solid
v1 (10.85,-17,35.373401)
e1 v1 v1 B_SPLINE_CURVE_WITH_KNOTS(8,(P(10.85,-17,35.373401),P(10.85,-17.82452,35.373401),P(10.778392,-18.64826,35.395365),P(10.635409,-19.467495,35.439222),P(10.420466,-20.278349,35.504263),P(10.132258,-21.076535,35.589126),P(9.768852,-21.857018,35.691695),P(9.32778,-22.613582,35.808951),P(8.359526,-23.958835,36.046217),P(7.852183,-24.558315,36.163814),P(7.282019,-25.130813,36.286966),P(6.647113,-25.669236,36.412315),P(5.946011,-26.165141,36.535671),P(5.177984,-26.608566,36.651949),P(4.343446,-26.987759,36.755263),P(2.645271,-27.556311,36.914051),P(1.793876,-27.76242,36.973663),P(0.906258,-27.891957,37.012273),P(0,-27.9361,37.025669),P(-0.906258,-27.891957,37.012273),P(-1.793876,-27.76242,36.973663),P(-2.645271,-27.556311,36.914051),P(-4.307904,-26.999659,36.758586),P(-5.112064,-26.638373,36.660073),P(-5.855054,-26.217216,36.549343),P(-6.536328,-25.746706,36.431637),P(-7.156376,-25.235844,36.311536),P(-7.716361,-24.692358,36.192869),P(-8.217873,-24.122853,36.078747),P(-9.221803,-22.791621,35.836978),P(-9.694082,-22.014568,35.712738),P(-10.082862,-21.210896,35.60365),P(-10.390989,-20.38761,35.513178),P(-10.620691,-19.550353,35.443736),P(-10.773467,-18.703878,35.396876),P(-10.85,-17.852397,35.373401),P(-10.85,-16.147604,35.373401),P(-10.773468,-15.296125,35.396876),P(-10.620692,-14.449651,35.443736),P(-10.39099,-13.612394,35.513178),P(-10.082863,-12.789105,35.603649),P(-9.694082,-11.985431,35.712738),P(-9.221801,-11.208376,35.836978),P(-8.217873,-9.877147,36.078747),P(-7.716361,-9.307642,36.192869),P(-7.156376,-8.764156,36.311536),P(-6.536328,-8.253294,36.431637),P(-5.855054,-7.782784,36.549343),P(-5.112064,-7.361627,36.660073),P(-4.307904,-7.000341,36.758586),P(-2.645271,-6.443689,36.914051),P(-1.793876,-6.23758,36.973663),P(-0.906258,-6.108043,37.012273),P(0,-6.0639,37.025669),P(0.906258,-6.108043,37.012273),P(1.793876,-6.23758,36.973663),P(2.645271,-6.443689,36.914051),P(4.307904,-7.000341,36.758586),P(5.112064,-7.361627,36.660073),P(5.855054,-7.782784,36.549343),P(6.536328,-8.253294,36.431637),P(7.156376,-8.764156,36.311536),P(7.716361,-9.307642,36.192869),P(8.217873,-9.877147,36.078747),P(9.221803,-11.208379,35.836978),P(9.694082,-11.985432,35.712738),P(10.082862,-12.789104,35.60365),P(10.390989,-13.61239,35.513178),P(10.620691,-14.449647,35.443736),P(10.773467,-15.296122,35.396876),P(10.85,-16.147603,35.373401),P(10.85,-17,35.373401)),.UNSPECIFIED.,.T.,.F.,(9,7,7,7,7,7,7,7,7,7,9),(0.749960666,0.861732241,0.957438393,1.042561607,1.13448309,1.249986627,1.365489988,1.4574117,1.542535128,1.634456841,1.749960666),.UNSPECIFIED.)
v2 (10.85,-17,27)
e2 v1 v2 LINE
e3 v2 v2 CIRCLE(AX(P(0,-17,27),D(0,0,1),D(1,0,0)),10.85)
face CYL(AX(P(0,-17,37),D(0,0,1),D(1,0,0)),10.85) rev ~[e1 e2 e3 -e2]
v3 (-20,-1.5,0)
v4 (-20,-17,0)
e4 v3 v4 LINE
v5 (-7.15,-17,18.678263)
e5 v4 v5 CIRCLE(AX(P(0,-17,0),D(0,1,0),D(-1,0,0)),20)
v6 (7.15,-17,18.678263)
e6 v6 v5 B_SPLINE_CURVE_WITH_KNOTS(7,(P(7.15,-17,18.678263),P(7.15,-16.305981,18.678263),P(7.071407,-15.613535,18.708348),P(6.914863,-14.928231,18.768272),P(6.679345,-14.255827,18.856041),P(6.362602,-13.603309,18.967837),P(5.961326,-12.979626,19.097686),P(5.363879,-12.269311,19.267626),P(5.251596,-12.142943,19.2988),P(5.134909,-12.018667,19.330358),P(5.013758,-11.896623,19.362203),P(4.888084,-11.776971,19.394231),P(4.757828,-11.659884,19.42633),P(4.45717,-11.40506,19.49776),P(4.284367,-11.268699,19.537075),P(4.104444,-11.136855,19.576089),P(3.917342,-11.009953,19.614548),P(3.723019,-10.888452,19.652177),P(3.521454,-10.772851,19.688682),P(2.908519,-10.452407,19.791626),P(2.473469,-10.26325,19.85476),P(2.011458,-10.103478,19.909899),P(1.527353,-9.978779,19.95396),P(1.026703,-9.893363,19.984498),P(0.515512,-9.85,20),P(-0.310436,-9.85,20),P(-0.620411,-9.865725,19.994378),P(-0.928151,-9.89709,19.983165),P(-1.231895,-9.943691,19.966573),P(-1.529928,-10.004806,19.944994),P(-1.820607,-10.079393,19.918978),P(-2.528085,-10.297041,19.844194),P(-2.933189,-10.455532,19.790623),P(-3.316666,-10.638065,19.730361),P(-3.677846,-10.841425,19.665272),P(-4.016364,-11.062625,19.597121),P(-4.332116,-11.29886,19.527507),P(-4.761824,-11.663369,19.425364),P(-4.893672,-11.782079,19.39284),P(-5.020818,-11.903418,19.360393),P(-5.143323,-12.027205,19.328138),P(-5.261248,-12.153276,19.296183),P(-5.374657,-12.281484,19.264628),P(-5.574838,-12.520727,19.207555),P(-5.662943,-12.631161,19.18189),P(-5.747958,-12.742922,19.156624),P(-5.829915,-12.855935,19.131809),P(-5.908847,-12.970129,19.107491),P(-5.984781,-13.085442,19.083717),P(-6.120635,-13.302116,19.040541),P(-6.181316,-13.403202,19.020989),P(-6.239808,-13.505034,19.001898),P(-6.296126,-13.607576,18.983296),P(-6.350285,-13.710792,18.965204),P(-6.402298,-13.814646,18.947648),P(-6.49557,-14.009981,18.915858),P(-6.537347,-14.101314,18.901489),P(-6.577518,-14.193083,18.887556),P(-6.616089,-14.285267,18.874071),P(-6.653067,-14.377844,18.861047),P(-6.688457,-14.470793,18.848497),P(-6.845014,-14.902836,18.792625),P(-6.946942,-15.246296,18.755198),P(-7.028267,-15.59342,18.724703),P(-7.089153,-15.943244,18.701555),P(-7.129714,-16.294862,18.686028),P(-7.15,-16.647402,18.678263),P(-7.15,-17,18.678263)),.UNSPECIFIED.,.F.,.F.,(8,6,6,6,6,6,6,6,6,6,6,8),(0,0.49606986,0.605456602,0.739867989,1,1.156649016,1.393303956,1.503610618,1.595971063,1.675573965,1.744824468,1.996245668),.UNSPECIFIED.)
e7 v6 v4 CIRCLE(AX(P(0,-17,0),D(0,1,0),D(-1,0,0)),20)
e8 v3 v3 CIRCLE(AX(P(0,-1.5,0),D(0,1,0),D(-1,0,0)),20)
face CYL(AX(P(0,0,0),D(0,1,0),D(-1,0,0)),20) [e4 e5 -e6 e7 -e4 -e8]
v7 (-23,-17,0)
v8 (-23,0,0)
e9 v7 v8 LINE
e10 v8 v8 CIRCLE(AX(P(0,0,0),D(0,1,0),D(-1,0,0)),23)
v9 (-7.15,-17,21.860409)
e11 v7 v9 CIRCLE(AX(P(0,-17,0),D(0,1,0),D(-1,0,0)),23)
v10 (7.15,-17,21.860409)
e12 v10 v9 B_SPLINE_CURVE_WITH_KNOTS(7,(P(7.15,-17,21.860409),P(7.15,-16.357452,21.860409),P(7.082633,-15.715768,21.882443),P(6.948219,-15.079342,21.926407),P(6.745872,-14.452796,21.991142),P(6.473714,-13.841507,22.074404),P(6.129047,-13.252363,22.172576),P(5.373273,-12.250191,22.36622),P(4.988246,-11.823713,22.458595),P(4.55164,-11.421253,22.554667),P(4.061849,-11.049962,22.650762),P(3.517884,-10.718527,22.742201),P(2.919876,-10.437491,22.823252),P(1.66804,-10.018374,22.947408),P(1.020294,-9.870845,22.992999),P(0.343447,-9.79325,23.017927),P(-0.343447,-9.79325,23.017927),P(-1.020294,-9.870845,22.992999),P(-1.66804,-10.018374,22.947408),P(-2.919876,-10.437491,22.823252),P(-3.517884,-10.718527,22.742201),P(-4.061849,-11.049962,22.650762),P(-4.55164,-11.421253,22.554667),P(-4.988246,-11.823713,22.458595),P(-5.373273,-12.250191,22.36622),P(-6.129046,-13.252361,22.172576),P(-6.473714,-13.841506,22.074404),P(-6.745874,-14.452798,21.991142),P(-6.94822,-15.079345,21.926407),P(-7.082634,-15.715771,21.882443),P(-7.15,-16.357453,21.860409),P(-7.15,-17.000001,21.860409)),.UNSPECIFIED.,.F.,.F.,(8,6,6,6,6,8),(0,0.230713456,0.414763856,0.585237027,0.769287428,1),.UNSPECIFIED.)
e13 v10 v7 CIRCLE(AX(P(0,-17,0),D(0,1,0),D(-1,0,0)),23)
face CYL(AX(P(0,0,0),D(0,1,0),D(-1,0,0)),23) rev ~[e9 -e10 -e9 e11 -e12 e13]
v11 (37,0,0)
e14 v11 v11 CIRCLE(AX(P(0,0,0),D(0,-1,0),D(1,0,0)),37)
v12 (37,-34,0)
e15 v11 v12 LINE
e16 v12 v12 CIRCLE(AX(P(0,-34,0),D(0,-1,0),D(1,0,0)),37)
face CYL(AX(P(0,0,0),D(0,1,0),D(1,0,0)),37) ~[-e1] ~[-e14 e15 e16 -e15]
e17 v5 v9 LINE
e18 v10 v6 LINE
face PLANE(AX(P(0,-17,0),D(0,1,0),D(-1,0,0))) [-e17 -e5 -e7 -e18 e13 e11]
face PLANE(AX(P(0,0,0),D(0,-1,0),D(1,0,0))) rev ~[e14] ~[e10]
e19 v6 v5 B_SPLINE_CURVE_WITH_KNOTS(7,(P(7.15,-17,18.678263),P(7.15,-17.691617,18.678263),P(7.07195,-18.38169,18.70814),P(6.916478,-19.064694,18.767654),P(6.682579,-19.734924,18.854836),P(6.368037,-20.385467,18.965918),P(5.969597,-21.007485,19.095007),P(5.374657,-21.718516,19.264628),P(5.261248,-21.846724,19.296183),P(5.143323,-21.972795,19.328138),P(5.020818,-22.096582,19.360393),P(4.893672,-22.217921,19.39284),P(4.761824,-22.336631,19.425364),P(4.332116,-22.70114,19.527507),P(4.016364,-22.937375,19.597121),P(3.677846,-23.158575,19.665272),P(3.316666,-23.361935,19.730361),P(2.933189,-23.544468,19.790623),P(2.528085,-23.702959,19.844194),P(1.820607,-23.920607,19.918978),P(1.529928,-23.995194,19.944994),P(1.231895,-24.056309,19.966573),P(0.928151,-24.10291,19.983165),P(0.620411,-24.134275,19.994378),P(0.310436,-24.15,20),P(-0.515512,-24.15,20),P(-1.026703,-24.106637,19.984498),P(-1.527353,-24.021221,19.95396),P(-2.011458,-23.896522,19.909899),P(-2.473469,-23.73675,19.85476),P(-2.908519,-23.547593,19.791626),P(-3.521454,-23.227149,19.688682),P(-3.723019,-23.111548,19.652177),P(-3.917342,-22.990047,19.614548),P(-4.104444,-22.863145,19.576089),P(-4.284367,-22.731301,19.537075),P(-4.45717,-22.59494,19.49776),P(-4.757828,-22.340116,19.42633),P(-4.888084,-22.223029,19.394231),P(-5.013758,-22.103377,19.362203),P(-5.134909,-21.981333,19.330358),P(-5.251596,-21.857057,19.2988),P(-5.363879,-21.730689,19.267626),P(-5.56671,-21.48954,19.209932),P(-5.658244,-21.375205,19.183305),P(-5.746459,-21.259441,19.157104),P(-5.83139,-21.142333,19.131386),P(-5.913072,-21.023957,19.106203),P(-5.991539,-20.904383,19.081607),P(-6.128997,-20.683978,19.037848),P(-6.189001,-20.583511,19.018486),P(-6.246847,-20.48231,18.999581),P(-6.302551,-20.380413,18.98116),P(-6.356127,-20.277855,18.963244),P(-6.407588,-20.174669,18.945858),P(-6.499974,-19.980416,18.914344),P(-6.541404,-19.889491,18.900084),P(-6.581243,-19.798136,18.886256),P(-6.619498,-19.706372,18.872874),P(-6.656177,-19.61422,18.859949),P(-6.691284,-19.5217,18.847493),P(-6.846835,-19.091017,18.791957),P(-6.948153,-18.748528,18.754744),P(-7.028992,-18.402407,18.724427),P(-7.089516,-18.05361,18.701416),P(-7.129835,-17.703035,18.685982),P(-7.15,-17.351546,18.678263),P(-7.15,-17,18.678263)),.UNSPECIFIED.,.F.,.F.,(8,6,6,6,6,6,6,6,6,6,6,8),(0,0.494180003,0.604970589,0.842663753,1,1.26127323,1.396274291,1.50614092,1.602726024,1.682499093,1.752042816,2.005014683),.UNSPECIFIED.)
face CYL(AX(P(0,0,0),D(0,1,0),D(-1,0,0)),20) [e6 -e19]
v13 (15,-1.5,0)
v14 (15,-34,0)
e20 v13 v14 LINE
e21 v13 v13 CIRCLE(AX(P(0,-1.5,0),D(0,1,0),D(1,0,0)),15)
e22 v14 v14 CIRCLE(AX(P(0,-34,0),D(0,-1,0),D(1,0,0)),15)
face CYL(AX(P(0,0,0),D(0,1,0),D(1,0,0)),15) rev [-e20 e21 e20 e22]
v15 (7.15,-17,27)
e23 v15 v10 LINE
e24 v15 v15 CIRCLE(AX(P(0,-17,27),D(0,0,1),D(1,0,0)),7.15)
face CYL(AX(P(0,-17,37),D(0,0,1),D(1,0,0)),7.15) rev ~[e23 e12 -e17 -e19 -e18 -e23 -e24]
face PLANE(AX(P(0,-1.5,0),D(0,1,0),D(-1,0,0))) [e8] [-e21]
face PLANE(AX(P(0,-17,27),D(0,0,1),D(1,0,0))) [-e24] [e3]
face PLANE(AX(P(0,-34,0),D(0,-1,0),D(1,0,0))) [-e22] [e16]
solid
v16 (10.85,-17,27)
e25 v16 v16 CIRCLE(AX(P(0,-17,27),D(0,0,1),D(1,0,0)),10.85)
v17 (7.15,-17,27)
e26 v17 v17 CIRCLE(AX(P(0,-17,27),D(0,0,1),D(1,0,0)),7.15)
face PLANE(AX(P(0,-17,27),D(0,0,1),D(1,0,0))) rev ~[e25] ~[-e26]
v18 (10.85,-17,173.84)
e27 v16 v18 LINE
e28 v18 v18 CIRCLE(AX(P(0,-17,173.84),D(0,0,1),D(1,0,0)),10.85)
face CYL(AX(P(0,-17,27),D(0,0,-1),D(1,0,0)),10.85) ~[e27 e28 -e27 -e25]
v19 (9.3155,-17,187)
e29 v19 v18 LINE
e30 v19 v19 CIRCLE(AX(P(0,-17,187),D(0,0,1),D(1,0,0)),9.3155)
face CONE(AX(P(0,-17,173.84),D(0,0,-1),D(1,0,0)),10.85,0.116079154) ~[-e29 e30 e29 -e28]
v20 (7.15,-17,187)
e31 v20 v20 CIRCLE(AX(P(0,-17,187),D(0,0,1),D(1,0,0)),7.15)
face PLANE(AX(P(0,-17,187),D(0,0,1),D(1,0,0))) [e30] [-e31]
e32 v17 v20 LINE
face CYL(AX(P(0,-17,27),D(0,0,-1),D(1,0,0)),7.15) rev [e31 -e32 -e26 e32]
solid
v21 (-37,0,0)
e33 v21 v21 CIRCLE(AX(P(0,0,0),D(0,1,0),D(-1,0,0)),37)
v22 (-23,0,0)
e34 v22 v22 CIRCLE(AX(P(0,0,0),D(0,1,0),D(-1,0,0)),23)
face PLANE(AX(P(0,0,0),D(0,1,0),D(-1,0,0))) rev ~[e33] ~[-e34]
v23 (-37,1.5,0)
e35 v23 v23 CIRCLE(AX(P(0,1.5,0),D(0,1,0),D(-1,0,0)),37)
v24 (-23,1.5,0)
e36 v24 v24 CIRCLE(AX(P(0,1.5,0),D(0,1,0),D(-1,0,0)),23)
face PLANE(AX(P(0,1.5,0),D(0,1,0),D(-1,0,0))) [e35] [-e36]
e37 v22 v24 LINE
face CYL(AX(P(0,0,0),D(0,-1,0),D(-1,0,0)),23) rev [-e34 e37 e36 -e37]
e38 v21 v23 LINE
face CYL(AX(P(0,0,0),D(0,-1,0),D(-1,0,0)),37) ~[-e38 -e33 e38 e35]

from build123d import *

# Parameters (mm, degrees)
F0_R          = 37
F0_R_2        = 15
F1_DEPTH      = 34
F2_R          = 23
F2_R_2        = 15
F3_DEPTH      = 1.5
F4_R          = 23
F4_R_2        = 20
F5_DEPTH      = 17
F8_END_RADIUS = 20
F7_R          = 7.15
F8_REACH      = 94.2242539419
F9_R          = 10.85
F10_DEPTH     = 10
F11_R         = 10.85
F11_R_2       = 7.15
F12_DEPTH     = 160
F13_SIZE2     = 13.16
F13_SIZE      = 1.5345
F14_R         = 37
F14_R_2       = 23
F15_DEPTH     = 1.5


with BuildPart() as f1:
    # F0 (on Front) → F1 (new body)
    with BuildSketch(Plane.XZ):
        Circle(F0_R)
        Circle(F0_R_2, mode=Mode.SUBTRACT)
    extrude(amount=F1_DEPTH)

    # F2 (on face) → F3 (cut)
    with BuildSketch(Plane(origin=(0, 0, 0), x_dir=(-1, 0, 0), z_dir=(0, 1, 0))):
        Circle(F2_R)
        Circle(F2_R_2, mode=Mode.SUBTRACT)
    extrude(amount=-F3_DEPTH, mode=Mode.SUBTRACT)

    # F4 (on face) → F5 (cut)
    with BuildSketch(Plane(origin=(0, 0, 0), x_dir=(-1, 0, 0), z_dir=(0, 1, 0))):
        Circle(F4_R)
        Circle(F4_R_2, mode=Mode.SUBTRACT)
    extrude(amount=-F5_DEPTH, mode=Mode.SUBTRACT)

    f8_end = (Plane.ZX.offset(-9.25) * Cylinder(F8_END_RADIUS, 408.5212231395, mode=Mode.PRIVATE)).faces().sort_by_distance((20, -9.25, 0))[0]
    # F7 (on offset) → F8 (cut, up to the whole of a round face its end follows)
    with BuildSketch(Plane.XY.offset(37)):
        with Locations((0, -17)):
            Circle(F7_R)
    f8_long = extrude(amount=-F8_REACH, mode=Mode.PRIVATE)
    add(split(f8_long, bisect_by=f8_end, keep=Keep.ALL, mode=Mode.PRIVATE).solids().sort_by_distance((0, -17, 37))[0], mode=Mode.SUBTRACT)

    # F9 (on offset) → F10 (cut)
    with BuildSketch(Plane.XY.offset(37)):
        with Locations((0, -17)):
            Circle(F9_R)
    extrude(amount=-F10_DEPTH, mode=Mode.SUBTRACT)


with BuildPart() as f12:
    # F11 (on face) → F12 (new body)
    with BuildSketch(Plane.XY.offset(27)):
        with Locations((0, -17)):
            Circle(F11_R)
        with Locations((0, -17)):
            Circle(F11_R_2, mode=Mode.SUBTRACT)
    extrude(amount=F12_DEPTH)

    # F13
    f13_edges = [f12.edges().sort_by_distance(p)[0] for p in [
        (-10.85, -17, 187),
    ]]
    f13_side = f12.faces().sort_by_distance((-10.543116, -17, 187))[0]
    chamfer(f13_edges, length=F13_SIZE, length2=F13_SIZE2, reference=f13_side)


with BuildPart() as f15:
    # F14 (on face) → F15 (new body)
    with BuildSketch(Plane(origin=(0, 0, 0), x_dir=(-1, 0, 0), z_dir=(0, 1, 0))):
        Circle(F14_R)
        Circle(F14_R_2, mode=Mode.SUBTRACT)
    extrude(amount=F15_DEPTH)


solid = Compound([f1.part, f12.part, f15.part])
